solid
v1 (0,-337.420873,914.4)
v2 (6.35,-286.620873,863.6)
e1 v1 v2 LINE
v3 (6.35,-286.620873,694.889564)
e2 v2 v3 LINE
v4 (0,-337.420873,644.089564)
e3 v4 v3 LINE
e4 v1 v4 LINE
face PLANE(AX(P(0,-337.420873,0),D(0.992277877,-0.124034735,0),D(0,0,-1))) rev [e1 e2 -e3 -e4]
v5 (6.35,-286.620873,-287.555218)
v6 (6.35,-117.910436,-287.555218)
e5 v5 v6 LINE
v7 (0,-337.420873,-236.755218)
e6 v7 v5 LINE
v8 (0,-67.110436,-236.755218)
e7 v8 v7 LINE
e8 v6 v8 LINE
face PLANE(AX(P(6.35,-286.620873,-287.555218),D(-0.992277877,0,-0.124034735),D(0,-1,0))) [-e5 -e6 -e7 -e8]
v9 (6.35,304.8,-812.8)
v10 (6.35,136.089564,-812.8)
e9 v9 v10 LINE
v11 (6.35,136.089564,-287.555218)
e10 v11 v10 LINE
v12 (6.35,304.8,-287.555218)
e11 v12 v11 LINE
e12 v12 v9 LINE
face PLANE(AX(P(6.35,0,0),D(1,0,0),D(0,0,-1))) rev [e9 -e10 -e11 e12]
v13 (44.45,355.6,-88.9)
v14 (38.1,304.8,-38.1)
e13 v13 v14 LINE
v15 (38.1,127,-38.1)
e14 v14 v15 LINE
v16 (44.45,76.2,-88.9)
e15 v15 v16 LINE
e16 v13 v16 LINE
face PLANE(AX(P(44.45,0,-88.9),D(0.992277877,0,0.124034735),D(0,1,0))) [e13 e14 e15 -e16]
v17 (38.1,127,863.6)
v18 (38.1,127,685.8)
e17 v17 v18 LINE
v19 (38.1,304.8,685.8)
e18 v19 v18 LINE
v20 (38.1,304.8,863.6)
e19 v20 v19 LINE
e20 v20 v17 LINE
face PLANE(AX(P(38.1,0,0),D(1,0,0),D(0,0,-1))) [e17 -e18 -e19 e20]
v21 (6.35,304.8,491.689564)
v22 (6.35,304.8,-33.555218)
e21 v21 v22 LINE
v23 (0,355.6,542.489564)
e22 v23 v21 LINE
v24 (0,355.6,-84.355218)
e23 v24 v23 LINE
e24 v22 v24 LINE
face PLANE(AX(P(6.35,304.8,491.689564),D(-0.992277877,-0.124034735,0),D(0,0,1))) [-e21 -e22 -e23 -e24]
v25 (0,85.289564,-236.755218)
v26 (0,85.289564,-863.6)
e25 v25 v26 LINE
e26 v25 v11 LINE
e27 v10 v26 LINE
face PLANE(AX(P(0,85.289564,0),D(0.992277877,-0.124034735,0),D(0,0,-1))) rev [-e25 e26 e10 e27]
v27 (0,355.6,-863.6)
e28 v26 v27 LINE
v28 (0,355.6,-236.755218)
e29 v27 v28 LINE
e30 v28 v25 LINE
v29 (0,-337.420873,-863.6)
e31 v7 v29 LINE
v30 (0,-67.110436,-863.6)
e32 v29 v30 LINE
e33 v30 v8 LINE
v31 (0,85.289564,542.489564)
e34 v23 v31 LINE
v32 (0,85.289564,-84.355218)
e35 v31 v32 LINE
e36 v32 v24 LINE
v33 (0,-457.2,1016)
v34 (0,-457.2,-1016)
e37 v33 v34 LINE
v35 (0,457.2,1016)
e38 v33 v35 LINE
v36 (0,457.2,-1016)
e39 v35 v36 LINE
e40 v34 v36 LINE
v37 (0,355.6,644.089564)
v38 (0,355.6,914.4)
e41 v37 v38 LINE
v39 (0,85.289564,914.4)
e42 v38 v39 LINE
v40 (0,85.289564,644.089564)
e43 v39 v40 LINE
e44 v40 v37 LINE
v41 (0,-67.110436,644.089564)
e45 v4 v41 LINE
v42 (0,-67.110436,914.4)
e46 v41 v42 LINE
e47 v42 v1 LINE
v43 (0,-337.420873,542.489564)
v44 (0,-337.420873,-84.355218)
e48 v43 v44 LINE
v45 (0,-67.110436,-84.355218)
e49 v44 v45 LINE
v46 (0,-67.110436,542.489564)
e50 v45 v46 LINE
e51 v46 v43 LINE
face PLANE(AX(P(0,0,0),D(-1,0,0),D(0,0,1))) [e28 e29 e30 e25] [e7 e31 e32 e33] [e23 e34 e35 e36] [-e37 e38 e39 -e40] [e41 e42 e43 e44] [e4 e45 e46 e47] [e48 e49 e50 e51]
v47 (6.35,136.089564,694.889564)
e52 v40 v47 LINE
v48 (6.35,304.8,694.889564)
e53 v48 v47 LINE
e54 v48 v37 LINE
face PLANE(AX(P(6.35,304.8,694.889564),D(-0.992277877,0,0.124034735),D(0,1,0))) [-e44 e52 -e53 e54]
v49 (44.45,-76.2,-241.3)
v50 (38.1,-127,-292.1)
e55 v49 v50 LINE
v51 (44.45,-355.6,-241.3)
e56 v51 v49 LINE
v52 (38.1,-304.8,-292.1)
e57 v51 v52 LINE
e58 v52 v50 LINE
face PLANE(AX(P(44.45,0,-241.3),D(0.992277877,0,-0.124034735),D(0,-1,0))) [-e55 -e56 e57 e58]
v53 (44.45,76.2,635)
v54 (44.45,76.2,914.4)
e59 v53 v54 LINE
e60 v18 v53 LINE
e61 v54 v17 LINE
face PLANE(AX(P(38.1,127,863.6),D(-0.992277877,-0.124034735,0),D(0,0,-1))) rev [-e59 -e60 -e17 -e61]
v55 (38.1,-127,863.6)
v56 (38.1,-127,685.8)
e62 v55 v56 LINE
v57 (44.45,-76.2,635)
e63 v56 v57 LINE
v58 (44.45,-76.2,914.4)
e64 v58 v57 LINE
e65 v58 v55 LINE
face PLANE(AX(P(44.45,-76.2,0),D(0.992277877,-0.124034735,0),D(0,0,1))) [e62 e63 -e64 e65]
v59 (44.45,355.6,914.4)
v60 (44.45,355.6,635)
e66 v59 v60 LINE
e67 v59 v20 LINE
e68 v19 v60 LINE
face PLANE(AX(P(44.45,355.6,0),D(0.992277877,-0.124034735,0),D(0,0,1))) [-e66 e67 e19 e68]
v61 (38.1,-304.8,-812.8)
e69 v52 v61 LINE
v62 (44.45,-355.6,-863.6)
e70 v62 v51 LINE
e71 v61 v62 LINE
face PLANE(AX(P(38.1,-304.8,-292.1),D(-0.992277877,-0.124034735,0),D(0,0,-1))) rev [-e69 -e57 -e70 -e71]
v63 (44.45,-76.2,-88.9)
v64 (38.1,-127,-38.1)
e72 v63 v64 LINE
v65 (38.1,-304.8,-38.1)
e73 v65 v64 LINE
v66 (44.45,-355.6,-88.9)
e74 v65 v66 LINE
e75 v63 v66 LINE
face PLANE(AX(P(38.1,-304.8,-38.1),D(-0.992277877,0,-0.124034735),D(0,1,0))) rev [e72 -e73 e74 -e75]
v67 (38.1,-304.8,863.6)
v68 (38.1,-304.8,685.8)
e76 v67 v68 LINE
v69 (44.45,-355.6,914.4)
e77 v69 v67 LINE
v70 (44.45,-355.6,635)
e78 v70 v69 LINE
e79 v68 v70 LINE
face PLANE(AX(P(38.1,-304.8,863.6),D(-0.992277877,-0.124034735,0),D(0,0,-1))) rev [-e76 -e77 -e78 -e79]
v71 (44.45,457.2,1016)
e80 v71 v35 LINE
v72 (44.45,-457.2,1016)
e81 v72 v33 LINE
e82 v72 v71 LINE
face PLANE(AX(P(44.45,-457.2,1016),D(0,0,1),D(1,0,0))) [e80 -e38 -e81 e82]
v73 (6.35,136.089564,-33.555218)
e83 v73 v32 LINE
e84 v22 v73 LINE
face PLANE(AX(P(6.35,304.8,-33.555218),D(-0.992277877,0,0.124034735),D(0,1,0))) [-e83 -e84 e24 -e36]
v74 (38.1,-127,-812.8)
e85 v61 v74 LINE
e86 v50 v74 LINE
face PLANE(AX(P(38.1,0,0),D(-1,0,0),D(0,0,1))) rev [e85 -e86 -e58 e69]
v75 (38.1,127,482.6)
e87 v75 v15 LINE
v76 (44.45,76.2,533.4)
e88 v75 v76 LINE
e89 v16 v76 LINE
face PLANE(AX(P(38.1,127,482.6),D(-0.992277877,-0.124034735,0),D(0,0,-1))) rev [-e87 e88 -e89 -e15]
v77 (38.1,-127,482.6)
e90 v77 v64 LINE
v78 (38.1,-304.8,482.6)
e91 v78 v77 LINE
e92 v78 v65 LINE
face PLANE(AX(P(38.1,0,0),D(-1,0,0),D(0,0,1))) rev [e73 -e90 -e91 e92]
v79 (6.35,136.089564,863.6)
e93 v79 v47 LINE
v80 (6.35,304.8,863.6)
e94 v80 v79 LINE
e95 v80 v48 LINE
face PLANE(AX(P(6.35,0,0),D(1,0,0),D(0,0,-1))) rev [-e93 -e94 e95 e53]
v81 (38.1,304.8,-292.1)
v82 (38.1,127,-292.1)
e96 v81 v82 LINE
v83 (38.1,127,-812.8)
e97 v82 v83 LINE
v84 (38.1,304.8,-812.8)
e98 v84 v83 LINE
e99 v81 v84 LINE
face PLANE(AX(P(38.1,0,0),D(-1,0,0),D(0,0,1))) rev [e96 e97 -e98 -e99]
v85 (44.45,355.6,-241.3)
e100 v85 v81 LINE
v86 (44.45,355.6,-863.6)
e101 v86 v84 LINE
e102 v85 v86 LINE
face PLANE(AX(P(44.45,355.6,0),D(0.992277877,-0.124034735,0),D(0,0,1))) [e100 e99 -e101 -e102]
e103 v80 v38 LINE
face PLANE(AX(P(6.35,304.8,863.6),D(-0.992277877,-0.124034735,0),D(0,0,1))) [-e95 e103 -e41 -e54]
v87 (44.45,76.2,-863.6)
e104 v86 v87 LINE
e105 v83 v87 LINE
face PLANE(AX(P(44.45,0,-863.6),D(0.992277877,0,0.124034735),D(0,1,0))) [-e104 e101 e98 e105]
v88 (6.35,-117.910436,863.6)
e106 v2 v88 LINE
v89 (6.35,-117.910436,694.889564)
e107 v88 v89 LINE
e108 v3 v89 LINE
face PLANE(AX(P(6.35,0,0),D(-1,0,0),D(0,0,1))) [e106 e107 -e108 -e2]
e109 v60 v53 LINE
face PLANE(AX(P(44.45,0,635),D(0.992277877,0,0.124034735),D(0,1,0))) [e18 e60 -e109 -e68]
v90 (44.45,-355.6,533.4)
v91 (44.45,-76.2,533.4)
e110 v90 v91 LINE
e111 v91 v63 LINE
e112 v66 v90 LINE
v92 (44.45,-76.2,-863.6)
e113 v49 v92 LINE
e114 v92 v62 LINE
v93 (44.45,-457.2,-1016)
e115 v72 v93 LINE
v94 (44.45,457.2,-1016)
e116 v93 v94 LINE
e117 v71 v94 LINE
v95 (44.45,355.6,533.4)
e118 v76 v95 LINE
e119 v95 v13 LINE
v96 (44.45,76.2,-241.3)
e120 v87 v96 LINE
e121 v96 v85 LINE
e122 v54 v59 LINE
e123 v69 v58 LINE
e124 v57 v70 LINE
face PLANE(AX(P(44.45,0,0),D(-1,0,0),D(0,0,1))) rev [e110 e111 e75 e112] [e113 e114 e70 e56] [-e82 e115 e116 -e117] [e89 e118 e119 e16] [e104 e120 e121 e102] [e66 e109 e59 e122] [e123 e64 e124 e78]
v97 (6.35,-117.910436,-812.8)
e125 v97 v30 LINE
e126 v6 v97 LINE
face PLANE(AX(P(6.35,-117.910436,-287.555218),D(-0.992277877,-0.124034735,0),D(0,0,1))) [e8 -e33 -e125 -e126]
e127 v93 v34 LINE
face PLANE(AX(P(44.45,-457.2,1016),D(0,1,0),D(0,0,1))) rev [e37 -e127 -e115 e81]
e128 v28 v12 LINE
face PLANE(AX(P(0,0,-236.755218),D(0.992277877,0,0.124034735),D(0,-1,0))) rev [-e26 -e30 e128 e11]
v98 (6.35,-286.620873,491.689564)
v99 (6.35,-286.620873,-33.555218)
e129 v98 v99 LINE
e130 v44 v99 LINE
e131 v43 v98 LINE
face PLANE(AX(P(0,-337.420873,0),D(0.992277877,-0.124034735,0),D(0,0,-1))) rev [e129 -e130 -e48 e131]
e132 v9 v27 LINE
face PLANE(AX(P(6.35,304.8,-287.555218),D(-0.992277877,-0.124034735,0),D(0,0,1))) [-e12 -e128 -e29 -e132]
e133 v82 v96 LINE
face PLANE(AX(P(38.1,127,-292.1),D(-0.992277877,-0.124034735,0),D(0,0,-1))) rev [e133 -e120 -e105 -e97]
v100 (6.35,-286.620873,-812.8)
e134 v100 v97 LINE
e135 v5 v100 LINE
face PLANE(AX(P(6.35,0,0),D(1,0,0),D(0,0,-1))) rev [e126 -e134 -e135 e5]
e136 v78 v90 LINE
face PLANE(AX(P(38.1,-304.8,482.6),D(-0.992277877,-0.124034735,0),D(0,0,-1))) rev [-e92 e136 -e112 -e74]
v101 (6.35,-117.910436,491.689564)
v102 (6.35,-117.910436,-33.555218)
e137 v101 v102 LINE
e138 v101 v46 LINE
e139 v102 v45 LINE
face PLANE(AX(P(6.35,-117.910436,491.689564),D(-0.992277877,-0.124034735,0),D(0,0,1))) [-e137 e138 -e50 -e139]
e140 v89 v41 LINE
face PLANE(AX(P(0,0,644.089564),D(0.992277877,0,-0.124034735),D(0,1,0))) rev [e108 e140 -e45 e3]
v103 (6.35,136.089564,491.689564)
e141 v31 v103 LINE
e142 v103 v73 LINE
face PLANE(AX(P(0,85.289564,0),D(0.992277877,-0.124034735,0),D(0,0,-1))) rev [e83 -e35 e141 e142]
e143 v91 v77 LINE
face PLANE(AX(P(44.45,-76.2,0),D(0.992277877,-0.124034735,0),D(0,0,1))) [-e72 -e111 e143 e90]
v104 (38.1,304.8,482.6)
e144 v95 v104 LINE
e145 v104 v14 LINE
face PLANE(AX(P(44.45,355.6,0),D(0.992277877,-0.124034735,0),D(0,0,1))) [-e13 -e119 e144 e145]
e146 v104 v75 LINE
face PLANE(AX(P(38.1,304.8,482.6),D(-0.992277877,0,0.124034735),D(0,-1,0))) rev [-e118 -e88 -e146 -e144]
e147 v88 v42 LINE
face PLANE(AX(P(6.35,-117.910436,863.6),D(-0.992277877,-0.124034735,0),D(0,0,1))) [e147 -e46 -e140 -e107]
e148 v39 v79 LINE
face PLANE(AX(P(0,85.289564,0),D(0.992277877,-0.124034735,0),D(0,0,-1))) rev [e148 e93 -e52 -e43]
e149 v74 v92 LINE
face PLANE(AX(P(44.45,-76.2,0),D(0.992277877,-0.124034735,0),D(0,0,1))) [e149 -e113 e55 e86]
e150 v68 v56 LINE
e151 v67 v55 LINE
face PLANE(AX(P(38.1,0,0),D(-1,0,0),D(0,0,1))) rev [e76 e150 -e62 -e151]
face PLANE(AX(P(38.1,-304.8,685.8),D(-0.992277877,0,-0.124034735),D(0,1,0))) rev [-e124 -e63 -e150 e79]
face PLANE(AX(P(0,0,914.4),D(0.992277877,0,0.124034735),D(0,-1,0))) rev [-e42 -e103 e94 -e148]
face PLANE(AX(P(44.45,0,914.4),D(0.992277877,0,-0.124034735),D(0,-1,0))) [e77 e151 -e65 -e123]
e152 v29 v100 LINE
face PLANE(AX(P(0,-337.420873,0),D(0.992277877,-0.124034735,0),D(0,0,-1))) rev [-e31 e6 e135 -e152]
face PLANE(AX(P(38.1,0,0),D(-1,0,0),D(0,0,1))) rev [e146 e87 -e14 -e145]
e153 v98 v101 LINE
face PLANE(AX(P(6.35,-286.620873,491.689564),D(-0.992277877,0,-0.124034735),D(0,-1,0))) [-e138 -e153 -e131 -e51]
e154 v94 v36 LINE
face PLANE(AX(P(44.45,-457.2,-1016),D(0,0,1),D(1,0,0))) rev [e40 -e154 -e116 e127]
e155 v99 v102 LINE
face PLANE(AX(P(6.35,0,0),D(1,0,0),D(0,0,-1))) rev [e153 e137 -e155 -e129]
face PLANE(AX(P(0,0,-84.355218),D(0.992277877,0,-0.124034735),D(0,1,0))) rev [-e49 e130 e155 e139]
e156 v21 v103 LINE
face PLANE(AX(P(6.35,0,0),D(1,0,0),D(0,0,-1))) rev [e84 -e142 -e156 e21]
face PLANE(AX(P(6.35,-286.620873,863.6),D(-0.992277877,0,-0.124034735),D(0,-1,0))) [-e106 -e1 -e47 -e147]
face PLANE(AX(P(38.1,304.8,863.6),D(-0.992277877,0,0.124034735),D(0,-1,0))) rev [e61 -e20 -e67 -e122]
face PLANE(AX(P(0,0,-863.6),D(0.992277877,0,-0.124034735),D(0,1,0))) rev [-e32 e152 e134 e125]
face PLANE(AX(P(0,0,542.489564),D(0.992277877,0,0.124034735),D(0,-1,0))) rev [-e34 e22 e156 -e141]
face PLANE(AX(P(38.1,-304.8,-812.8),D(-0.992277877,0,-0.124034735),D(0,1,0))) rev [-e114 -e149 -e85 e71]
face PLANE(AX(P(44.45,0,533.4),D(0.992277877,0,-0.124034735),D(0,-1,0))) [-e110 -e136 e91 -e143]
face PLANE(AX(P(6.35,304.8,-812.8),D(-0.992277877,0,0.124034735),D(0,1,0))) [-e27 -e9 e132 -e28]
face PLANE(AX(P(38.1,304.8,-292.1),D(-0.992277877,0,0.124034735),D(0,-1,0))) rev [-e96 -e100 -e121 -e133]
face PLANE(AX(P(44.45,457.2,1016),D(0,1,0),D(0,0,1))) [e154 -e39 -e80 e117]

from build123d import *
from OCP.BRepFilletAPI import BRepFilletAPI_MakeChamfer

# Parameters (mm, degrees)
SKETCH1_W           = 914.4
SKETCH1_H           = 2032
BOSS_EXTRUDE1_DEPTH = 44.45
SKETCH2_W           = 177.8
SKETCH2_H           = 520.7
SKETCH2_H_2         = 177.8
CUT_EXTRUDE1_DEPTH  = 6.35
CHAMFER1_SIZE       = 50.8
CHAMFER1_SIZE_2     = 6.35
SKETCH3_W           = 168.710436435
SKETCH3_H           = 525.244781783
SKETCH3_H_2         = 168.710436435
SKETCH3_H_3         = 525.244781782
CUT_EXTRUDE2_DEPTH  = 6.35
CHAMFER2_SIZE       = 50.8
CHAMFER2_SIZE_2     = 6.35


with BuildPart() as part:
    # Sketch1 → Boss-Extrude1 (new body)
    with BuildSketch(Plane.YZ):
        Rectangle(SKETCH1_W, SKETCH1_H)
    extrude(amount=BOSS_EXTRUDE1_DEPTH)

    # Sketch2 → Cut-Extrude1 (cut)
    with BuildSketch(Plane.YZ.offset(44.45)):
        with Locations((-215.9, 222.25)):
            Rectangle(SKETCH2_W, SKETCH2_H)
        with Locations((-215.9, 774.7)):
            Rectangle(SKETCH2_W, SKETCH2_H_2)
        with Locations((-215.9, -552.45)):
            Rectangle(SKETCH2_W, SKETCH2_H)
        with Locations((215.9, -552.45)):
            Rectangle(SKETCH2_W, SKETCH2_H)
        with Locations((215.9, 222.25)):
            Rectangle(SKETCH2_W, SKETCH2_H)
        with Locations((215.9, 774.7)):
            Rectangle(SKETCH2_W, SKETCH2_H_2)
    extrude(amount=-CUT_EXTRUDE1_DEPTH, mode=Mode.SUBTRACT)

    # Chamfer1
    chamfer1_edges_1 = [part.edges().sort_by_distance(p)[0] for p in [
        (44.45, 215.9, -812.8),
    ]]
    chamfer1_side_1 = [part.faces().sort_by_distance(p)[0] for p in [
        (44.45, 215.9, -812.927),
    ]]
    chamfer1_edges_2 = [part.edges().sort_by_distance(p)[0] for p in [
        (44.45, 304.8, -552.45),
    ]]
    chamfer1_side_2 = [part.faces().sort_by_distance(p)[0] for p in [
        (44.45, 304.927, -552.45),
    ]]
    chamfer1_edges_3 = [part.edges().sort_by_distance(p)[0] for p in [
        (44.45, 215.9, -292.1),
    ]]
    chamfer1_side_3 = [part.faces().sort_by_distance(p)[0] for p in [
        (44.45, 215.9, -291.973),
    ]]
    chamfer1_edges_4 = [part.edges().sort_by_distance(p)[0] for p in [
        (44.45, 127, -552.45),
    ]]
    chamfer1_side_4 = [part.faces().sort_by_distance(p)[0] for p in [
        (44.45, 126.873, -552.45),
    ]]
    chamfer1_edges_5 = [part.edges().sort_by_distance(p)[0] for p in [
        (44.45, -127, -552.45),
    ]]
    chamfer1_side_5 = [part.faces().sort_by_distance(p)[0] for p in [
        (44.45, -126.873, -552.45),
    ]]
    chamfer1_edges_6 = [part.edges().sort_by_distance(p)[0] for p in [
        (44.45, -215.9, -812.8),
    ]]
    chamfer1_side_6 = [part.faces().sort_by_distance(p)[0] for p in [
        (44.45, -215.9, -812.927),
    ]]
    chamfer1_edges_7 = [part.edges().sort_by_distance(p)[0] for p in [
        (44.45, -215.9, -292.1),
    ]]
    chamfer1_side_7 = [part.faces().sort_by_distance(p)[0] for p in [
        (44.45, -215.9, -291.973),
    ]]
    chamfer1_edges_8 = [part.edges().sort_by_distance(p)[0] for p in [
        (44.45, -304.8, -552.45),
    ]]
    chamfer1_side_8 = [part.faces().sort_by_distance(p)[0] for p in [
        (44.45, -304.927, -552.45),
    ]]
    chamfer1_edges_9 = [part.edges().sort_by_distance(p)[0] for p in [
        (44.45, 215.9, -38.1),
    ]]
    chamfer1_side_9 = [part.faces().sort_by_distance(p)[0] for p in [
        (44.45, 215.9, -38.227),
    ]]
    chamfer1_edges_10 = [part.edges().sort_by_distance(p)[0] for p in [
        (44.45, 304.8, 222.25),
    ]]
    chamfer1_side_10 = [part.faces().sort_by_distance(p)[0] for p in [
        (44.45, 304.927, 222.25),
    ]]
    chamfer1_edges_11 = [part.edges().sort_by_distance(p)[0] for p in [
        (44.45, 215.9, 482.6),
    ]]
    chamfer1_side_11 = [part.faces().sort_by_distance(p)[0] for p in [
        (44.45, 215.9, 482.727),
    ]]
    chamfer1_edges_12 = [part.edges().sort_by_distance(p)[0] for p in [
        (44.45, 127, 222.25),
    ]]
    chamfer1_side_12 = [part.faces().sort_by_distance(p)[0] for p in [
        (44.45, 126.873, 222.25),
    ]]
    chamfer1_edges_13 = [part.edges().sort_by_distance(p)[0] for p in [
        (44.45, -215.9, -38.1),
    ]]
    chamfer1_side_13 = [part.faces().sort_by_distance(p)[0] for p in [
        (44.45, -215.9, -38.227),
    ]]
    chamfer1_edges_14 = [part.edges().sort_by_distance(p)[0] for p in [
        (44.45, -127, 222.25),
    ]]
    chamfer1_side_14 = [part.faces().sort_by_distance(p)[0] for p in [
        (44.45, -126.873, 222.25),
    ]]
    chamfer1_edges_15 = [part.edges().sort_by_distance(p)[0] for p in [
        (44.45, -304.8, 222.25),
    ]]
    chamfer1_side_15 = [part.faces().sort_by_distance(p)[0] for p in [
        (44.45, -304.927, 222.25),
    ]]
    chamfer1_edges_16 = [part.edges().sort_by_distance(p)[0] for p in [
        (44.45, -215.9, 482.6),
    ]]
    chamfer1_side_16 = [part.faces().sort_by_distance(p)[0] for p in [
        (44.45, -215.9, 482.727),
    ]]
    chamfer1_edges_17 = [part.edges().sort_by_distance(p)[0] for p in [
        (44.45, 304.8, 774.7),
    ]]
    chamfer1_side_17 = [part.faces().sort_by_distance(p)[0] for p in [
        (44.45, 304.927, 774.7),
    ]]
    chamfer1_edges_18 = [part.edges().sort_by_distance(p)[0] for p in [
        (44.45, 215.9, 685.8),
    ]]
    chamfer1_side_18 = [part.faces().sort_by_distance(p)[0] for p in [
        (44.45, 215.9, 685.673),
    ]]
    chamfer1_edges_19 = [part.edges().sort_by_distance(p)[0] for p in [
        (44.45, 215.9, 863.6),
    ]]
    chamfer1_side_19 = [part.faces().sort_by_distance(p)[0] for p in [
        (44.45, 215.9, 863.727),
    ]]
    chamfer1_edges_20 = [part.edges().sort_by_distance(p)[0] for p in [
        (44.45, 127, 774.7),
    ]]
    chamfer1_side_20 = [part.faces().sort_by_distance(p)[0] for p in [
        (44.45, 126.873, 774.7),
    ]]
    chamfer1_edges_21 = [part.edges().sort_by_distance(p)[0] for p in [
        (44.45, -127, 774.7),
    ]]
    chamfer1_side_21 = [part.faces().sort_by_distance(p)[0] for p in [
        (44.45, -126.873, 774.7),
    ]]
    chamfer1_edges_22 = [part.edges().sort_by_distance(p)[0] for p in [
        (44.45, -215.9, 685.8),
    ]]
    chamfer1_side_22 = [part.faces().sort_by_distance(p)[0] for p in [
        (44.45, -215.9, 685.673),
    ]]
    chamfer1_edges_23 = [part.edges().sort_by_distance(p)[0] for p in [
        (44.45, -304.8, 774.7),
    ]]
    chamfer1_side_23 = [part.faces().sort_by_distance(p)[0] for p in [
        (44.45, -304.927, 774.7),
    ]]
    chamfer1_edges_24 = [part.edges().sort_by_distance(p)[0] for p in [
        (44.45, -215.9, 863.6),
    ]]
    chamfer1_side_24 = [part.faces().sort_by_distance(p)[0] for p in [
        (44.45, -215.9, 863.727),
    ]]
    chamfer1 = BRepFilletAPI_MakeChamfer(part.part.solid().wrapped)
    for e in chamfer1_edges_1:
        chamfer1.Add(CHAMFER1_SIZE - 0.0001, CHAMFER1_SIZE_2 - 0.0001, e.wrapped, chamfer1_side_1[0].wrapped)
    for e in chamfer1_edges_2:
        chamfer1.Add(CHAMFER1_SIZE - 0.0001, CHAMFER1_SIZE_2 - 0.0001, e.wrapped, chamfer1_side_2[0].wrapped)
    for e in chamfer1_edges_3:
        chamfer1.Add(CHAMFER1_SIZE - 0.0001, CHAMFER1_SIZE_2 - 0.0001, e.wrapped, chamfer1_side_3[0].wrapped)
    for e in chamfer1_edges_4:
        chamfer1.Add(CHAMFER1_SIZE - 0.0001, CHAMFER1_SIZE_2 - 0.0001, e.wrapped, chamfer1_side_4[0].wrapped)
    for e in chamfer1_edges_5:
        chamfer1.Add(CHAMFER1_SIZE - 0.0001, CHAMFER1_SIZE_2 - 0.0001, e.wrapped, chamfer1_side_5[0].wrapped)
    for e in chamfer1_edges_6:
        chamfer1.Add(CHAMFER1_SIZE - 0.0001, CHAMFER1_SIZE_2 - 0.0001, e.wrapped, chamfer1_side_6[0].wrapped)
    for e in chamfer1_edges_7:
        chamfer1.Add(CHAMFER1_SIZE - 0.0001, CHAMFER1_SIZE_2 - 0.0001, e.wrapped, chamfer1_side_7[0].wrapped)
    for e in chamfer1_edges_8:
        chamfer1.Add(CHAMFER1_SIZE - 0.0001, CHAMFER1_SIZE_2 - 0.0001, e.wrapped, chamfer1_side_8[0].wrapped)
    for e in chamfer1_edges_9:
        chamfer1.Add(CHAMFER1_SIZE - 0.0001, CHAMFER1_SIZE_2 - 0.0001, e.wrapped, chamfer1_side_9[0].wrapped)
    for e in chamfer1_edges_10:
        chamfer1.Add(CHAMFER1_SIZE - 0.0001, CHAMFER1_SIZE_2 - 0.0001, e.wrapped, chamfer1_side_10[0].wrapped)
    for e in chamfer1_edges_11:
        chamfer1.Add(CHAMFER1_SIZE - 0.0001, CHAMFER1_SIZE_2 - 0.0001, e.wrapped, chamfer1_side_11[0].wrapped)
    for e in chamfer1_edges_12:
        chamfer1.Add(CHAMFER1_SIZE - 0.0001, CHAMFER1_SIZE_2 - 0.0001, e.wrapped, chamfer1_side_12[0].wrapped)
    for e in chamfer1_edges_13:
        chamfer1.Add(CHAMFER1_SIZE - 0.0001, CHAMFER1_SIZE_2 - 0.0001, e.wrapped, chamfer1_side_13[0].wrapped)
    for e in chamfer1_edges_14:
        chamfer1.Add(CHAMFER1_SIZE - 0.0001, CHAMFER1_SIZE_2 - 0.0001, e.wrapped, chamfer1_side_14[0].wrapped)
    for e in chamfer1_edges_15:
        chamfer1.Add(CHAMFER1_SIZE - 0.0001, CHAMFER1_SIZE_2 - 0.0001, e.wrapped, chamfer1_side_15[0].wrapped)
    for e in chamfer1_edges_16:
        chamfer1.Add(CHAMFER1_SIZE - 0.0001, CHAMFER1_SIZE_2 - 0.0001, e.wrapped, chamfer1_side_16[0].wrapped)
    for e in chamfer1_edges_17:
        chamfer1.Add(CHAMFER1_SIZE - 0.0001, CHAMFER1_SIZE_2 - 0.0001, e.wrapped, chamfer1_side_17[0].wrapped)
    for e in chamfer1_edges_18:
        chamfer1.Add(CHAMFER1_SIZE - 0.0001, CHAMFER1_SIZE_2 - 0.0001, e.wrapped, chamfer1_side_18[0].wrapped)
    for e in chamfer1_edges_19:
        chamfer1.Add(CHAMFER1_SIZE - 0.0001, CHAMFER1_SIZE_2 - 0.0001, e.wrapped, chamfer1_side_19[0].wrapped)
    for e in chamfer1_edges_20:
        chamfer1.Add(CHAMFER1_SIZE - 0.0001, CHAMFER1_SIZE_2 - 0.0001, e.wrapped, chamfer1_side_20[0].wrapped)
    for e in chamfer1_edges_21:
        chamfer1.Add(CHAMFER1_SIZE - 0.0001, CHAMFER1_SIZE_2 - 0.0001, e.wrapped, chamfer1_side_21[0].wrapped)
    for e in chamfer1_edges_22:
        chamfer1.Add(CHAMFER1_SIZE - 0.0001, CHAMFER1_SIZE_2 - 0.0001, e.wrapped, chamfer1_side_22[0].wrapped)
    for e in chamfer1_edges_23:
        chamfer1.Add(CHAMFER1_SIZE - 0.0001, CHAMFER1_SIZE_2 - 0.0001, e.wrapped, chamfer1_side_23[0].wrapped)
    for e in chamfer1_edges_24:
        chamfer1.Add(CHAMFER1_SIZE - 0.0001, CHAMFER1_SIZE_2 - 0.0001, e.wrapped, chamfer1_side_24[0].wrapped)
    add(Compound.cast(chamfer1.Shape()), mode=Mode.REPLACE)  # a hair under: the kernel refuses the full size

    # Sketch3 → Cut-Extrude2 (cut)
    with BuildSketch(Plane(origin=(0, 0, 0), x_dir=(0, -1, 0), z_dir=(-1, 0, 0))):
        with Locations((-220.444781783, 229.067172674)):
            Rectangle(SKETCH3_W, SKETCH3_H)
        with Locations((-220.444781783, 779.244781783)):
            Rectangle(SKETCH3_W, SKETCH3_H_2)
        with Locations((-220.444781783, -550.177609109)):
            Rectangle(SKETCH3_W, SKETCH3_H_3)
        with Locations((202.265654653, -550.177609109)):
            Rectangle(SKETCH3_W, SKETCH3_H_3)
        with Locations((202.265654653, 229.067172674)):
            Rectangle(SKETCH3_W, SKETCH3_H)
        with Locations((202.265654653, 779.244781783)):
            Rectangle(SKETCH3_W, SKETCH3_H_2)
    extrude(amount=-CUT_EXTRUDE2_DEPTH, mode=Mode.SUBTRACT)

    # Chamfer2
    chamfer2_edges_1 = [part.edges().sort_by_distance(p)[0] for p in [
        (0, -202.265654653, -812.8),
    ]]
    chamfer2_side_1 = [part.faces().sort_by_distance(p)[0] for p in [
        (0, -202.265654653, -812.927),
    ]]
    chamfer2_edges_2 = [part.edges().sort_by_distance(p)[0] for p in [
        (0, -286.62087287, -550.177609109),
    ]]
    chamfer2_side_2 = [part.faces().sort_by_distance(p)[0] for p in [
        (0, -286.74787287, -550.177609109),
    ]]
    chamfer2_edges_3 = [part.edges().sort_by_distance(p)[0] for p in [
        (0, -202.265654653, -287.555218218),
    ]]
    chamfer2_side_3 = [part.faces().sort_by_distance(p)[0] for p in [
        (0, -202.265654653, -287.428218218),
    ]]
    chamfer2_edges_4 = [part.edges().sort_by_distance(p)[0] for p in [
        (0, -117.910436435, -550.177609109),
    ]]
    chamfer2_side_4 = [part.faces().sort_by_distance(p)[0] for p in [
        (0, -117.783436435, -550.177609109),
    ]]
    chamfer2_edges_5 = [part.edges().sort_by_distance(p)[0] for p in [
        (0, 136.089563565, -550.177609109),
    ]]
    chamfer2_side_5 = [part.faces().sort_by_distance(p)[0] for p in [
        (0, 135.962563565, -550.177609109),
    ]]
    chamfer2_edges_6 = [part.edges().sort_by_distance(p)[0] for p in [
        (0, 220.444781782, -812.8),
    ]]
    chamfer2_side_6 = [part.faces().sort_by_distance(p)[0] for p in [
        (0, 220.444781782, -812.927),
    ]]
    chamfer2_edges_7 = [part.edges().sort_by_distance(p)[0] for p in [
        (0, 304.8, -550.177609109),
    ]]
    chamfer2_side_7 = [part.faces().sort_by_distance(p)[0] for p in [
        (0, 304.927, -550.177609109),
    ]]
    chamfer2_edges_8 = [part.edges().sort_by_distance(p)[0] for p in [
        (0, 220.444781782, -287.555218218),
    ]]
    chamfer2_side_8 = [part.faces().sort_by_distance(p)[0] for p in [
        (0, 220.444781782, -287.428218218),
    ]]
    chamfer2_edges_9 = [part.edges().sort_by_distance(p)[0] for p in [
        (0, -202.265654653, -33.555218218),
    ]]
    chamfer2_side_9 = [part.faces().sort_by_distance(p)[0] for p in [
        (0, -202.265654653, -33.682218218),
    ]]
    chamfer2_edges_10 = [part.edges().sort_by_distance(p)[0] for p in [
        (0, -286.62087287, 229.067172674),
    ]]
    chamfer2_side_10 = [part.faces().sort_by_distance(p)[0] for p in [
        (0, -286.74787287, 229.067172674),
    ]]
    chamfer2_edges_11 = [part.edges().sort_by_distance(p)[0] for p in [
        (0, -202.265654653, 491.689563565),
    ]]
    chamfer2_side_11 = [part.faces().sort_by_distance(p)[0] for p in [
        (0, -202.265654653, 491.816563565),
    ]]
    chamfer2_edges_12 = [part.edges().sort_by_distance(p)[0] for p in [
        (0, -117.910436435, 229.067172674),
    ]]
    chamfer2_side_12 = [part.faces().sort_by_distance(p)[0] for p in [
        (0, -117.783436435, 229.067172674),
    ]]
    chamfer2_edges_13 = [part.edges().sort_by_distance(p)[0] for p in [
        (0, 136.089563565, 229.067172674),
    ]]
    chamfer2_side_13 = [part.faces().sort_by_distance(p)[0] for p in [
        (0, 135.962563565, 229.067172674),
    ]]
    chamfer2_edges_14 = [part.edges().sort_by_distance(p)[0] for p in [
        (0, 220.444781782, -33.555218218),
    ]]
    chamfer2_side_14 = [part.faces().sort_by_distance(p)[0] for p in [
        (0, 220.444781782, -33.682218218),
    ]]
    chamfer2_edges_15 = [part.edges().sort_by_distance(p)[0] for p in [
        (0, 304.8, 229.067172674),
    ]]
    chamfer2_side_15 = [part.faces().sort_by_distance(p)[0] for p in [
        (0, 304.927, 229.067172674),
    ]]
    chamfer2_edges_16 = [part.edges().sort_by_distance(p)[0] for p in [
        (0, 220.444781782, 491.689563565),
    ]]
    chamfer2_side_16 = [part.faces().sort_by_distance(p)[0] for p in [
        (0, 220.444781782, 491.816563565),
    ]]
    chamfer2_edges_17 = [part.edges().sort_by_distance(p)[0] for p in [
        (0, -202.265654653, 694.889563565),
    ]]
    chamfer2_side_17 = [part.faces().sort_by_distance(p)[0] for p in [
        (0, -202.265654653, 694.762563565),
    ]]
    chamfer2_edges_18 = [part.edges().sort_by_distance(p)[0] for p in [
        (0, -286.62087287, 779.244781782),
    ]]
    chamfer2_side_18 = [part.faces().sort_by_distance(p)[0] for p in [
        (0, -286.74787287, 779.244781782),
    ]]
    chamfer2_edges_19 = [part.edges().sort_by_distance(p)[0] for p in [
        (0, -202.265654653, 863.6),
    ]]
    chamfer2_side_19 = [part.faces().sort_by_distance(p)[0] for p in [
        (0, -202.265654653, 863.727),
    ]]
    chamfer2_edges_20 = [part.edges().sort_by_distance(p)[0] for p in [
        (0, -117.910436435, 779.244781782),
    ]]
    chamfer2_side_20 = [part.faces().sort_by_distance(p)[0] for p in [
        (0, -117.783436435, 779.244781782),
    ]]
    chamfer2_edges_21 = [part.edges().sort_by_distance(p)[0] for p in [
        (0, 220.444781782, 694.889563565),
    ]]
    chamfer2_side_21 = [part.faces().sort_by_distance(p)[0] for p in [
        (0, 220.444781782, 694.762563565),
    ]]
    chamfer2_edges_22 = [part.edges().sort_by_distance(p)[0] for p in [
        (0, 136.089563565, 779.244781782),
    ]]
    chamfer2_side_22 = [part.faces().sort_by_distance(p)[0] for p in [
        (0, 135.962563565, 779.244781782),
    ]]
    chamfer2_edges_23 = [part.edges().sort_by_distance(p)[0] for p in [
        (0, 220.444781782, 863.6),
    ]]
    chamfer2_side_23 = [part.faces().sort_by_distance(p)[0] for p in [
        (0, 220.444781782, 863.727),
    ]]
    chamfer2_edges_24 = [part.edges().sort_by_distance(p)[0] for p in [
        (0, 304.8, 779.244781782),
    ]]
    chamfer2_side_24 = [part.faces().sort_by_distance(p)[0] for p in [
        (0, 304.927, 779.244781782),
    ]]
    chamfer2 = BRepFilletAPI_MakeChamfer(part.part.solid().wrapped)
    for e in chamfer2_edges_1:
        chamfer2.Add(CHAMFER2_SIZE - 0.0001, CHAMFER2_SIZE_2 - 0.0001, e.wrapped, chamfer2_side_1[0].wrapped)
    for e in chamfer2_edges_2:
        chamfer2.Add(CHAMFER2_SIZE - 0.0001, CHAMFER2_SIZE_2 - 0.0001, e.wrapped, chamfer2_side_2[0].wrapped)
    for e in chamfer2_edges_3:
        chamfer2.Add(CHAMFER2_SIZE - 0.0001, CHAMFER2_SIZE_2 - 0.0001, e.wrapped, chamfer2_side_3[0].wrapped)
    for e in chamfer2_edges_4:
        chamfer2.Add(CHAMFER2_SIZE - 0.0001, CHAMFER2_SIZE_2 - 0.0001, e.wrapped, chamfer2_side_4[0].wrapped)
    for e in chamfer2_edges_5:
        chamfer2.Add(CHAMFER2_SIZE - 0.0001, CHAMFER2_SIZE_2 - 0.0001, e.wrapped, chamfer2_side_5[0].wrapped)
    for e in chamfer2_edges_6:
        chamfer2.Add(CHAMFER2_SIZE - 0.0001, CHAMFER2_SIZE_2 - 0.0001, e.wrapped, chamfer2_side_6[0].wrapped)
    for e in chamfer2_edges_7:
        chamfer2.Add(CHAMFER2_SIZE - 0.0001, CHAMFER2_SIZE_2 - 0.0001, e.wrapped, chamfer2_side_7[0].wrapped)
    for e in chamfer2_edges_8:
        chamfer2.Add(CHAMFER2_SIZE - 0.0001, CHAMFER2_SIZE_2 - 0.0001, e.wrapped, chamfer2_side_8[0].wrapped)
    for e in chamfer2_edges_9:
        chamfer2.Add(CHAMFER2_SIZE - 0.0001, CHAMFER2_SIZE_2 - 0.0001, e.wrapped, chamfer2_side_9[0].wrapped)
    for e in chamfer2_edges_10:
        chamfer2.Add(CHAMFER2_SIZE - 0.0001, CHAMFER2_SIZE_2 - 0.0001, e.wrapped, chamfer2_side_10[0].wrapped)
    for e in chamfer2_edges_11:
        chamfer2.Add(CHAMFER2_SIZE - 0.0001, CHAMFER2_SIZE_2 - 0.0001, e.wrapped, chamfer2_side_11[0].wrapped)
    for e in chamfer2_edges_12:
        chamfer2.Add(CHAMFER2_SIZE - 0.0001, CHAMFER2_SIZE_2 - 0.0001, e.wrapped, chamfer2_side_12[0].wrapped)
    for e in chamfer2_edges_13:
        chamfer2.Add(CHAMFER2_SIZE - 0.0001, CHAMFER2_SIZE_2 - 0.0001, e.wrapped, chamfer2_side_13[0].wrapped)
    for e in chamfer2_edges_14:
        chamfer2.Add(CHAMFER2_SIZE - 0.0001, CHAMFER2_SIZE_2 - 0.0001, e.wrapped, chamfer2_side_14[0].wrapped)
    for e in chamfer2_edges_15:
        chamfer2.Add(CHAMFER2_SIZE - 0.0001, CHAMFER2_SIZE_2 - 0.0001, e.wrapped, chamfer2_side_15[0].wrapped)
    for e in chamfer2_edges_16:
        chamfer2.Add(CHAMFER2_SIZE - 0.0001, CHAMFER2_SIZE_2 - 0.0001, e.wrapped, chamfer2_side_16[0].wrapped)
    for e in chamfer2_edges_17:
        chamfer2.Add(CHAMFER2_SIZE - 0.0001, CHAMFER2_SIZE_2 - 0.0001, e.wrapped, chamfer2_side_17[0].wrapped)
    for e in chamfer2_edges_18:
        chamfer2.Add(CHAMFER2_SIZE - 0.0001, CHAMFER2_SIZE_2 - 0.0001, e.wrapped, chamfer2_side_18[0].wrapped)
    for e in chamfer2_edges_19:
        chamfer2.Add(CHAMFER2_SIZE - 0.0001, CHAMFER2_SIZE_2 - 0.0001, e.wrapped, chamfer2_side_19[0].wrapped)
    for e in chamfer2_edges_20:
        chamfer2.Add(CHAMFER2_SIZE - 0.0001, CHAMFER2_SIZE_2 - 0.0001, e.wrapped, chamfer2_side_20[0].wrapped)
    for e in chamfer2_edges_21:
        chamfer2.Add(CHAMFER2_SIZE - 0.0001, CHAMFER2_SIZE_2 - 0.0001, e.wrapped, chamfer2_side_21[0].wrapped)
    for e in chamfer2_edges_22:
        chamfer2.Add(CHAMFER2_SIZE - 0.0001, CHAMFER2_SIZE_2 - 0.0001, e.wrapped, chamfer2_side_22[0].wrapped)
    for e in chamfer2_edges_23:
        chamfer2.Add(CHAMFER2_SIZE - 0.0001, CHAMFER2_SIZE_2 - 0.0001, e.wrapped, chamfer2_side_23[0].wrapped)
    for e in chamfer2_edges_24:
        chamfer2.Add(CHAMFER2_SIZE - 0.0001, CHAMFER2_SIZE_2 - 0.0001, e.wrapped, chamfer2_side_24[0].wrapped)
    add(Compound.cast(chamfer2.Shape()), mode=Mode.REPLACE)  # a hair under: the kernel refuses the full size


solid = part.part
